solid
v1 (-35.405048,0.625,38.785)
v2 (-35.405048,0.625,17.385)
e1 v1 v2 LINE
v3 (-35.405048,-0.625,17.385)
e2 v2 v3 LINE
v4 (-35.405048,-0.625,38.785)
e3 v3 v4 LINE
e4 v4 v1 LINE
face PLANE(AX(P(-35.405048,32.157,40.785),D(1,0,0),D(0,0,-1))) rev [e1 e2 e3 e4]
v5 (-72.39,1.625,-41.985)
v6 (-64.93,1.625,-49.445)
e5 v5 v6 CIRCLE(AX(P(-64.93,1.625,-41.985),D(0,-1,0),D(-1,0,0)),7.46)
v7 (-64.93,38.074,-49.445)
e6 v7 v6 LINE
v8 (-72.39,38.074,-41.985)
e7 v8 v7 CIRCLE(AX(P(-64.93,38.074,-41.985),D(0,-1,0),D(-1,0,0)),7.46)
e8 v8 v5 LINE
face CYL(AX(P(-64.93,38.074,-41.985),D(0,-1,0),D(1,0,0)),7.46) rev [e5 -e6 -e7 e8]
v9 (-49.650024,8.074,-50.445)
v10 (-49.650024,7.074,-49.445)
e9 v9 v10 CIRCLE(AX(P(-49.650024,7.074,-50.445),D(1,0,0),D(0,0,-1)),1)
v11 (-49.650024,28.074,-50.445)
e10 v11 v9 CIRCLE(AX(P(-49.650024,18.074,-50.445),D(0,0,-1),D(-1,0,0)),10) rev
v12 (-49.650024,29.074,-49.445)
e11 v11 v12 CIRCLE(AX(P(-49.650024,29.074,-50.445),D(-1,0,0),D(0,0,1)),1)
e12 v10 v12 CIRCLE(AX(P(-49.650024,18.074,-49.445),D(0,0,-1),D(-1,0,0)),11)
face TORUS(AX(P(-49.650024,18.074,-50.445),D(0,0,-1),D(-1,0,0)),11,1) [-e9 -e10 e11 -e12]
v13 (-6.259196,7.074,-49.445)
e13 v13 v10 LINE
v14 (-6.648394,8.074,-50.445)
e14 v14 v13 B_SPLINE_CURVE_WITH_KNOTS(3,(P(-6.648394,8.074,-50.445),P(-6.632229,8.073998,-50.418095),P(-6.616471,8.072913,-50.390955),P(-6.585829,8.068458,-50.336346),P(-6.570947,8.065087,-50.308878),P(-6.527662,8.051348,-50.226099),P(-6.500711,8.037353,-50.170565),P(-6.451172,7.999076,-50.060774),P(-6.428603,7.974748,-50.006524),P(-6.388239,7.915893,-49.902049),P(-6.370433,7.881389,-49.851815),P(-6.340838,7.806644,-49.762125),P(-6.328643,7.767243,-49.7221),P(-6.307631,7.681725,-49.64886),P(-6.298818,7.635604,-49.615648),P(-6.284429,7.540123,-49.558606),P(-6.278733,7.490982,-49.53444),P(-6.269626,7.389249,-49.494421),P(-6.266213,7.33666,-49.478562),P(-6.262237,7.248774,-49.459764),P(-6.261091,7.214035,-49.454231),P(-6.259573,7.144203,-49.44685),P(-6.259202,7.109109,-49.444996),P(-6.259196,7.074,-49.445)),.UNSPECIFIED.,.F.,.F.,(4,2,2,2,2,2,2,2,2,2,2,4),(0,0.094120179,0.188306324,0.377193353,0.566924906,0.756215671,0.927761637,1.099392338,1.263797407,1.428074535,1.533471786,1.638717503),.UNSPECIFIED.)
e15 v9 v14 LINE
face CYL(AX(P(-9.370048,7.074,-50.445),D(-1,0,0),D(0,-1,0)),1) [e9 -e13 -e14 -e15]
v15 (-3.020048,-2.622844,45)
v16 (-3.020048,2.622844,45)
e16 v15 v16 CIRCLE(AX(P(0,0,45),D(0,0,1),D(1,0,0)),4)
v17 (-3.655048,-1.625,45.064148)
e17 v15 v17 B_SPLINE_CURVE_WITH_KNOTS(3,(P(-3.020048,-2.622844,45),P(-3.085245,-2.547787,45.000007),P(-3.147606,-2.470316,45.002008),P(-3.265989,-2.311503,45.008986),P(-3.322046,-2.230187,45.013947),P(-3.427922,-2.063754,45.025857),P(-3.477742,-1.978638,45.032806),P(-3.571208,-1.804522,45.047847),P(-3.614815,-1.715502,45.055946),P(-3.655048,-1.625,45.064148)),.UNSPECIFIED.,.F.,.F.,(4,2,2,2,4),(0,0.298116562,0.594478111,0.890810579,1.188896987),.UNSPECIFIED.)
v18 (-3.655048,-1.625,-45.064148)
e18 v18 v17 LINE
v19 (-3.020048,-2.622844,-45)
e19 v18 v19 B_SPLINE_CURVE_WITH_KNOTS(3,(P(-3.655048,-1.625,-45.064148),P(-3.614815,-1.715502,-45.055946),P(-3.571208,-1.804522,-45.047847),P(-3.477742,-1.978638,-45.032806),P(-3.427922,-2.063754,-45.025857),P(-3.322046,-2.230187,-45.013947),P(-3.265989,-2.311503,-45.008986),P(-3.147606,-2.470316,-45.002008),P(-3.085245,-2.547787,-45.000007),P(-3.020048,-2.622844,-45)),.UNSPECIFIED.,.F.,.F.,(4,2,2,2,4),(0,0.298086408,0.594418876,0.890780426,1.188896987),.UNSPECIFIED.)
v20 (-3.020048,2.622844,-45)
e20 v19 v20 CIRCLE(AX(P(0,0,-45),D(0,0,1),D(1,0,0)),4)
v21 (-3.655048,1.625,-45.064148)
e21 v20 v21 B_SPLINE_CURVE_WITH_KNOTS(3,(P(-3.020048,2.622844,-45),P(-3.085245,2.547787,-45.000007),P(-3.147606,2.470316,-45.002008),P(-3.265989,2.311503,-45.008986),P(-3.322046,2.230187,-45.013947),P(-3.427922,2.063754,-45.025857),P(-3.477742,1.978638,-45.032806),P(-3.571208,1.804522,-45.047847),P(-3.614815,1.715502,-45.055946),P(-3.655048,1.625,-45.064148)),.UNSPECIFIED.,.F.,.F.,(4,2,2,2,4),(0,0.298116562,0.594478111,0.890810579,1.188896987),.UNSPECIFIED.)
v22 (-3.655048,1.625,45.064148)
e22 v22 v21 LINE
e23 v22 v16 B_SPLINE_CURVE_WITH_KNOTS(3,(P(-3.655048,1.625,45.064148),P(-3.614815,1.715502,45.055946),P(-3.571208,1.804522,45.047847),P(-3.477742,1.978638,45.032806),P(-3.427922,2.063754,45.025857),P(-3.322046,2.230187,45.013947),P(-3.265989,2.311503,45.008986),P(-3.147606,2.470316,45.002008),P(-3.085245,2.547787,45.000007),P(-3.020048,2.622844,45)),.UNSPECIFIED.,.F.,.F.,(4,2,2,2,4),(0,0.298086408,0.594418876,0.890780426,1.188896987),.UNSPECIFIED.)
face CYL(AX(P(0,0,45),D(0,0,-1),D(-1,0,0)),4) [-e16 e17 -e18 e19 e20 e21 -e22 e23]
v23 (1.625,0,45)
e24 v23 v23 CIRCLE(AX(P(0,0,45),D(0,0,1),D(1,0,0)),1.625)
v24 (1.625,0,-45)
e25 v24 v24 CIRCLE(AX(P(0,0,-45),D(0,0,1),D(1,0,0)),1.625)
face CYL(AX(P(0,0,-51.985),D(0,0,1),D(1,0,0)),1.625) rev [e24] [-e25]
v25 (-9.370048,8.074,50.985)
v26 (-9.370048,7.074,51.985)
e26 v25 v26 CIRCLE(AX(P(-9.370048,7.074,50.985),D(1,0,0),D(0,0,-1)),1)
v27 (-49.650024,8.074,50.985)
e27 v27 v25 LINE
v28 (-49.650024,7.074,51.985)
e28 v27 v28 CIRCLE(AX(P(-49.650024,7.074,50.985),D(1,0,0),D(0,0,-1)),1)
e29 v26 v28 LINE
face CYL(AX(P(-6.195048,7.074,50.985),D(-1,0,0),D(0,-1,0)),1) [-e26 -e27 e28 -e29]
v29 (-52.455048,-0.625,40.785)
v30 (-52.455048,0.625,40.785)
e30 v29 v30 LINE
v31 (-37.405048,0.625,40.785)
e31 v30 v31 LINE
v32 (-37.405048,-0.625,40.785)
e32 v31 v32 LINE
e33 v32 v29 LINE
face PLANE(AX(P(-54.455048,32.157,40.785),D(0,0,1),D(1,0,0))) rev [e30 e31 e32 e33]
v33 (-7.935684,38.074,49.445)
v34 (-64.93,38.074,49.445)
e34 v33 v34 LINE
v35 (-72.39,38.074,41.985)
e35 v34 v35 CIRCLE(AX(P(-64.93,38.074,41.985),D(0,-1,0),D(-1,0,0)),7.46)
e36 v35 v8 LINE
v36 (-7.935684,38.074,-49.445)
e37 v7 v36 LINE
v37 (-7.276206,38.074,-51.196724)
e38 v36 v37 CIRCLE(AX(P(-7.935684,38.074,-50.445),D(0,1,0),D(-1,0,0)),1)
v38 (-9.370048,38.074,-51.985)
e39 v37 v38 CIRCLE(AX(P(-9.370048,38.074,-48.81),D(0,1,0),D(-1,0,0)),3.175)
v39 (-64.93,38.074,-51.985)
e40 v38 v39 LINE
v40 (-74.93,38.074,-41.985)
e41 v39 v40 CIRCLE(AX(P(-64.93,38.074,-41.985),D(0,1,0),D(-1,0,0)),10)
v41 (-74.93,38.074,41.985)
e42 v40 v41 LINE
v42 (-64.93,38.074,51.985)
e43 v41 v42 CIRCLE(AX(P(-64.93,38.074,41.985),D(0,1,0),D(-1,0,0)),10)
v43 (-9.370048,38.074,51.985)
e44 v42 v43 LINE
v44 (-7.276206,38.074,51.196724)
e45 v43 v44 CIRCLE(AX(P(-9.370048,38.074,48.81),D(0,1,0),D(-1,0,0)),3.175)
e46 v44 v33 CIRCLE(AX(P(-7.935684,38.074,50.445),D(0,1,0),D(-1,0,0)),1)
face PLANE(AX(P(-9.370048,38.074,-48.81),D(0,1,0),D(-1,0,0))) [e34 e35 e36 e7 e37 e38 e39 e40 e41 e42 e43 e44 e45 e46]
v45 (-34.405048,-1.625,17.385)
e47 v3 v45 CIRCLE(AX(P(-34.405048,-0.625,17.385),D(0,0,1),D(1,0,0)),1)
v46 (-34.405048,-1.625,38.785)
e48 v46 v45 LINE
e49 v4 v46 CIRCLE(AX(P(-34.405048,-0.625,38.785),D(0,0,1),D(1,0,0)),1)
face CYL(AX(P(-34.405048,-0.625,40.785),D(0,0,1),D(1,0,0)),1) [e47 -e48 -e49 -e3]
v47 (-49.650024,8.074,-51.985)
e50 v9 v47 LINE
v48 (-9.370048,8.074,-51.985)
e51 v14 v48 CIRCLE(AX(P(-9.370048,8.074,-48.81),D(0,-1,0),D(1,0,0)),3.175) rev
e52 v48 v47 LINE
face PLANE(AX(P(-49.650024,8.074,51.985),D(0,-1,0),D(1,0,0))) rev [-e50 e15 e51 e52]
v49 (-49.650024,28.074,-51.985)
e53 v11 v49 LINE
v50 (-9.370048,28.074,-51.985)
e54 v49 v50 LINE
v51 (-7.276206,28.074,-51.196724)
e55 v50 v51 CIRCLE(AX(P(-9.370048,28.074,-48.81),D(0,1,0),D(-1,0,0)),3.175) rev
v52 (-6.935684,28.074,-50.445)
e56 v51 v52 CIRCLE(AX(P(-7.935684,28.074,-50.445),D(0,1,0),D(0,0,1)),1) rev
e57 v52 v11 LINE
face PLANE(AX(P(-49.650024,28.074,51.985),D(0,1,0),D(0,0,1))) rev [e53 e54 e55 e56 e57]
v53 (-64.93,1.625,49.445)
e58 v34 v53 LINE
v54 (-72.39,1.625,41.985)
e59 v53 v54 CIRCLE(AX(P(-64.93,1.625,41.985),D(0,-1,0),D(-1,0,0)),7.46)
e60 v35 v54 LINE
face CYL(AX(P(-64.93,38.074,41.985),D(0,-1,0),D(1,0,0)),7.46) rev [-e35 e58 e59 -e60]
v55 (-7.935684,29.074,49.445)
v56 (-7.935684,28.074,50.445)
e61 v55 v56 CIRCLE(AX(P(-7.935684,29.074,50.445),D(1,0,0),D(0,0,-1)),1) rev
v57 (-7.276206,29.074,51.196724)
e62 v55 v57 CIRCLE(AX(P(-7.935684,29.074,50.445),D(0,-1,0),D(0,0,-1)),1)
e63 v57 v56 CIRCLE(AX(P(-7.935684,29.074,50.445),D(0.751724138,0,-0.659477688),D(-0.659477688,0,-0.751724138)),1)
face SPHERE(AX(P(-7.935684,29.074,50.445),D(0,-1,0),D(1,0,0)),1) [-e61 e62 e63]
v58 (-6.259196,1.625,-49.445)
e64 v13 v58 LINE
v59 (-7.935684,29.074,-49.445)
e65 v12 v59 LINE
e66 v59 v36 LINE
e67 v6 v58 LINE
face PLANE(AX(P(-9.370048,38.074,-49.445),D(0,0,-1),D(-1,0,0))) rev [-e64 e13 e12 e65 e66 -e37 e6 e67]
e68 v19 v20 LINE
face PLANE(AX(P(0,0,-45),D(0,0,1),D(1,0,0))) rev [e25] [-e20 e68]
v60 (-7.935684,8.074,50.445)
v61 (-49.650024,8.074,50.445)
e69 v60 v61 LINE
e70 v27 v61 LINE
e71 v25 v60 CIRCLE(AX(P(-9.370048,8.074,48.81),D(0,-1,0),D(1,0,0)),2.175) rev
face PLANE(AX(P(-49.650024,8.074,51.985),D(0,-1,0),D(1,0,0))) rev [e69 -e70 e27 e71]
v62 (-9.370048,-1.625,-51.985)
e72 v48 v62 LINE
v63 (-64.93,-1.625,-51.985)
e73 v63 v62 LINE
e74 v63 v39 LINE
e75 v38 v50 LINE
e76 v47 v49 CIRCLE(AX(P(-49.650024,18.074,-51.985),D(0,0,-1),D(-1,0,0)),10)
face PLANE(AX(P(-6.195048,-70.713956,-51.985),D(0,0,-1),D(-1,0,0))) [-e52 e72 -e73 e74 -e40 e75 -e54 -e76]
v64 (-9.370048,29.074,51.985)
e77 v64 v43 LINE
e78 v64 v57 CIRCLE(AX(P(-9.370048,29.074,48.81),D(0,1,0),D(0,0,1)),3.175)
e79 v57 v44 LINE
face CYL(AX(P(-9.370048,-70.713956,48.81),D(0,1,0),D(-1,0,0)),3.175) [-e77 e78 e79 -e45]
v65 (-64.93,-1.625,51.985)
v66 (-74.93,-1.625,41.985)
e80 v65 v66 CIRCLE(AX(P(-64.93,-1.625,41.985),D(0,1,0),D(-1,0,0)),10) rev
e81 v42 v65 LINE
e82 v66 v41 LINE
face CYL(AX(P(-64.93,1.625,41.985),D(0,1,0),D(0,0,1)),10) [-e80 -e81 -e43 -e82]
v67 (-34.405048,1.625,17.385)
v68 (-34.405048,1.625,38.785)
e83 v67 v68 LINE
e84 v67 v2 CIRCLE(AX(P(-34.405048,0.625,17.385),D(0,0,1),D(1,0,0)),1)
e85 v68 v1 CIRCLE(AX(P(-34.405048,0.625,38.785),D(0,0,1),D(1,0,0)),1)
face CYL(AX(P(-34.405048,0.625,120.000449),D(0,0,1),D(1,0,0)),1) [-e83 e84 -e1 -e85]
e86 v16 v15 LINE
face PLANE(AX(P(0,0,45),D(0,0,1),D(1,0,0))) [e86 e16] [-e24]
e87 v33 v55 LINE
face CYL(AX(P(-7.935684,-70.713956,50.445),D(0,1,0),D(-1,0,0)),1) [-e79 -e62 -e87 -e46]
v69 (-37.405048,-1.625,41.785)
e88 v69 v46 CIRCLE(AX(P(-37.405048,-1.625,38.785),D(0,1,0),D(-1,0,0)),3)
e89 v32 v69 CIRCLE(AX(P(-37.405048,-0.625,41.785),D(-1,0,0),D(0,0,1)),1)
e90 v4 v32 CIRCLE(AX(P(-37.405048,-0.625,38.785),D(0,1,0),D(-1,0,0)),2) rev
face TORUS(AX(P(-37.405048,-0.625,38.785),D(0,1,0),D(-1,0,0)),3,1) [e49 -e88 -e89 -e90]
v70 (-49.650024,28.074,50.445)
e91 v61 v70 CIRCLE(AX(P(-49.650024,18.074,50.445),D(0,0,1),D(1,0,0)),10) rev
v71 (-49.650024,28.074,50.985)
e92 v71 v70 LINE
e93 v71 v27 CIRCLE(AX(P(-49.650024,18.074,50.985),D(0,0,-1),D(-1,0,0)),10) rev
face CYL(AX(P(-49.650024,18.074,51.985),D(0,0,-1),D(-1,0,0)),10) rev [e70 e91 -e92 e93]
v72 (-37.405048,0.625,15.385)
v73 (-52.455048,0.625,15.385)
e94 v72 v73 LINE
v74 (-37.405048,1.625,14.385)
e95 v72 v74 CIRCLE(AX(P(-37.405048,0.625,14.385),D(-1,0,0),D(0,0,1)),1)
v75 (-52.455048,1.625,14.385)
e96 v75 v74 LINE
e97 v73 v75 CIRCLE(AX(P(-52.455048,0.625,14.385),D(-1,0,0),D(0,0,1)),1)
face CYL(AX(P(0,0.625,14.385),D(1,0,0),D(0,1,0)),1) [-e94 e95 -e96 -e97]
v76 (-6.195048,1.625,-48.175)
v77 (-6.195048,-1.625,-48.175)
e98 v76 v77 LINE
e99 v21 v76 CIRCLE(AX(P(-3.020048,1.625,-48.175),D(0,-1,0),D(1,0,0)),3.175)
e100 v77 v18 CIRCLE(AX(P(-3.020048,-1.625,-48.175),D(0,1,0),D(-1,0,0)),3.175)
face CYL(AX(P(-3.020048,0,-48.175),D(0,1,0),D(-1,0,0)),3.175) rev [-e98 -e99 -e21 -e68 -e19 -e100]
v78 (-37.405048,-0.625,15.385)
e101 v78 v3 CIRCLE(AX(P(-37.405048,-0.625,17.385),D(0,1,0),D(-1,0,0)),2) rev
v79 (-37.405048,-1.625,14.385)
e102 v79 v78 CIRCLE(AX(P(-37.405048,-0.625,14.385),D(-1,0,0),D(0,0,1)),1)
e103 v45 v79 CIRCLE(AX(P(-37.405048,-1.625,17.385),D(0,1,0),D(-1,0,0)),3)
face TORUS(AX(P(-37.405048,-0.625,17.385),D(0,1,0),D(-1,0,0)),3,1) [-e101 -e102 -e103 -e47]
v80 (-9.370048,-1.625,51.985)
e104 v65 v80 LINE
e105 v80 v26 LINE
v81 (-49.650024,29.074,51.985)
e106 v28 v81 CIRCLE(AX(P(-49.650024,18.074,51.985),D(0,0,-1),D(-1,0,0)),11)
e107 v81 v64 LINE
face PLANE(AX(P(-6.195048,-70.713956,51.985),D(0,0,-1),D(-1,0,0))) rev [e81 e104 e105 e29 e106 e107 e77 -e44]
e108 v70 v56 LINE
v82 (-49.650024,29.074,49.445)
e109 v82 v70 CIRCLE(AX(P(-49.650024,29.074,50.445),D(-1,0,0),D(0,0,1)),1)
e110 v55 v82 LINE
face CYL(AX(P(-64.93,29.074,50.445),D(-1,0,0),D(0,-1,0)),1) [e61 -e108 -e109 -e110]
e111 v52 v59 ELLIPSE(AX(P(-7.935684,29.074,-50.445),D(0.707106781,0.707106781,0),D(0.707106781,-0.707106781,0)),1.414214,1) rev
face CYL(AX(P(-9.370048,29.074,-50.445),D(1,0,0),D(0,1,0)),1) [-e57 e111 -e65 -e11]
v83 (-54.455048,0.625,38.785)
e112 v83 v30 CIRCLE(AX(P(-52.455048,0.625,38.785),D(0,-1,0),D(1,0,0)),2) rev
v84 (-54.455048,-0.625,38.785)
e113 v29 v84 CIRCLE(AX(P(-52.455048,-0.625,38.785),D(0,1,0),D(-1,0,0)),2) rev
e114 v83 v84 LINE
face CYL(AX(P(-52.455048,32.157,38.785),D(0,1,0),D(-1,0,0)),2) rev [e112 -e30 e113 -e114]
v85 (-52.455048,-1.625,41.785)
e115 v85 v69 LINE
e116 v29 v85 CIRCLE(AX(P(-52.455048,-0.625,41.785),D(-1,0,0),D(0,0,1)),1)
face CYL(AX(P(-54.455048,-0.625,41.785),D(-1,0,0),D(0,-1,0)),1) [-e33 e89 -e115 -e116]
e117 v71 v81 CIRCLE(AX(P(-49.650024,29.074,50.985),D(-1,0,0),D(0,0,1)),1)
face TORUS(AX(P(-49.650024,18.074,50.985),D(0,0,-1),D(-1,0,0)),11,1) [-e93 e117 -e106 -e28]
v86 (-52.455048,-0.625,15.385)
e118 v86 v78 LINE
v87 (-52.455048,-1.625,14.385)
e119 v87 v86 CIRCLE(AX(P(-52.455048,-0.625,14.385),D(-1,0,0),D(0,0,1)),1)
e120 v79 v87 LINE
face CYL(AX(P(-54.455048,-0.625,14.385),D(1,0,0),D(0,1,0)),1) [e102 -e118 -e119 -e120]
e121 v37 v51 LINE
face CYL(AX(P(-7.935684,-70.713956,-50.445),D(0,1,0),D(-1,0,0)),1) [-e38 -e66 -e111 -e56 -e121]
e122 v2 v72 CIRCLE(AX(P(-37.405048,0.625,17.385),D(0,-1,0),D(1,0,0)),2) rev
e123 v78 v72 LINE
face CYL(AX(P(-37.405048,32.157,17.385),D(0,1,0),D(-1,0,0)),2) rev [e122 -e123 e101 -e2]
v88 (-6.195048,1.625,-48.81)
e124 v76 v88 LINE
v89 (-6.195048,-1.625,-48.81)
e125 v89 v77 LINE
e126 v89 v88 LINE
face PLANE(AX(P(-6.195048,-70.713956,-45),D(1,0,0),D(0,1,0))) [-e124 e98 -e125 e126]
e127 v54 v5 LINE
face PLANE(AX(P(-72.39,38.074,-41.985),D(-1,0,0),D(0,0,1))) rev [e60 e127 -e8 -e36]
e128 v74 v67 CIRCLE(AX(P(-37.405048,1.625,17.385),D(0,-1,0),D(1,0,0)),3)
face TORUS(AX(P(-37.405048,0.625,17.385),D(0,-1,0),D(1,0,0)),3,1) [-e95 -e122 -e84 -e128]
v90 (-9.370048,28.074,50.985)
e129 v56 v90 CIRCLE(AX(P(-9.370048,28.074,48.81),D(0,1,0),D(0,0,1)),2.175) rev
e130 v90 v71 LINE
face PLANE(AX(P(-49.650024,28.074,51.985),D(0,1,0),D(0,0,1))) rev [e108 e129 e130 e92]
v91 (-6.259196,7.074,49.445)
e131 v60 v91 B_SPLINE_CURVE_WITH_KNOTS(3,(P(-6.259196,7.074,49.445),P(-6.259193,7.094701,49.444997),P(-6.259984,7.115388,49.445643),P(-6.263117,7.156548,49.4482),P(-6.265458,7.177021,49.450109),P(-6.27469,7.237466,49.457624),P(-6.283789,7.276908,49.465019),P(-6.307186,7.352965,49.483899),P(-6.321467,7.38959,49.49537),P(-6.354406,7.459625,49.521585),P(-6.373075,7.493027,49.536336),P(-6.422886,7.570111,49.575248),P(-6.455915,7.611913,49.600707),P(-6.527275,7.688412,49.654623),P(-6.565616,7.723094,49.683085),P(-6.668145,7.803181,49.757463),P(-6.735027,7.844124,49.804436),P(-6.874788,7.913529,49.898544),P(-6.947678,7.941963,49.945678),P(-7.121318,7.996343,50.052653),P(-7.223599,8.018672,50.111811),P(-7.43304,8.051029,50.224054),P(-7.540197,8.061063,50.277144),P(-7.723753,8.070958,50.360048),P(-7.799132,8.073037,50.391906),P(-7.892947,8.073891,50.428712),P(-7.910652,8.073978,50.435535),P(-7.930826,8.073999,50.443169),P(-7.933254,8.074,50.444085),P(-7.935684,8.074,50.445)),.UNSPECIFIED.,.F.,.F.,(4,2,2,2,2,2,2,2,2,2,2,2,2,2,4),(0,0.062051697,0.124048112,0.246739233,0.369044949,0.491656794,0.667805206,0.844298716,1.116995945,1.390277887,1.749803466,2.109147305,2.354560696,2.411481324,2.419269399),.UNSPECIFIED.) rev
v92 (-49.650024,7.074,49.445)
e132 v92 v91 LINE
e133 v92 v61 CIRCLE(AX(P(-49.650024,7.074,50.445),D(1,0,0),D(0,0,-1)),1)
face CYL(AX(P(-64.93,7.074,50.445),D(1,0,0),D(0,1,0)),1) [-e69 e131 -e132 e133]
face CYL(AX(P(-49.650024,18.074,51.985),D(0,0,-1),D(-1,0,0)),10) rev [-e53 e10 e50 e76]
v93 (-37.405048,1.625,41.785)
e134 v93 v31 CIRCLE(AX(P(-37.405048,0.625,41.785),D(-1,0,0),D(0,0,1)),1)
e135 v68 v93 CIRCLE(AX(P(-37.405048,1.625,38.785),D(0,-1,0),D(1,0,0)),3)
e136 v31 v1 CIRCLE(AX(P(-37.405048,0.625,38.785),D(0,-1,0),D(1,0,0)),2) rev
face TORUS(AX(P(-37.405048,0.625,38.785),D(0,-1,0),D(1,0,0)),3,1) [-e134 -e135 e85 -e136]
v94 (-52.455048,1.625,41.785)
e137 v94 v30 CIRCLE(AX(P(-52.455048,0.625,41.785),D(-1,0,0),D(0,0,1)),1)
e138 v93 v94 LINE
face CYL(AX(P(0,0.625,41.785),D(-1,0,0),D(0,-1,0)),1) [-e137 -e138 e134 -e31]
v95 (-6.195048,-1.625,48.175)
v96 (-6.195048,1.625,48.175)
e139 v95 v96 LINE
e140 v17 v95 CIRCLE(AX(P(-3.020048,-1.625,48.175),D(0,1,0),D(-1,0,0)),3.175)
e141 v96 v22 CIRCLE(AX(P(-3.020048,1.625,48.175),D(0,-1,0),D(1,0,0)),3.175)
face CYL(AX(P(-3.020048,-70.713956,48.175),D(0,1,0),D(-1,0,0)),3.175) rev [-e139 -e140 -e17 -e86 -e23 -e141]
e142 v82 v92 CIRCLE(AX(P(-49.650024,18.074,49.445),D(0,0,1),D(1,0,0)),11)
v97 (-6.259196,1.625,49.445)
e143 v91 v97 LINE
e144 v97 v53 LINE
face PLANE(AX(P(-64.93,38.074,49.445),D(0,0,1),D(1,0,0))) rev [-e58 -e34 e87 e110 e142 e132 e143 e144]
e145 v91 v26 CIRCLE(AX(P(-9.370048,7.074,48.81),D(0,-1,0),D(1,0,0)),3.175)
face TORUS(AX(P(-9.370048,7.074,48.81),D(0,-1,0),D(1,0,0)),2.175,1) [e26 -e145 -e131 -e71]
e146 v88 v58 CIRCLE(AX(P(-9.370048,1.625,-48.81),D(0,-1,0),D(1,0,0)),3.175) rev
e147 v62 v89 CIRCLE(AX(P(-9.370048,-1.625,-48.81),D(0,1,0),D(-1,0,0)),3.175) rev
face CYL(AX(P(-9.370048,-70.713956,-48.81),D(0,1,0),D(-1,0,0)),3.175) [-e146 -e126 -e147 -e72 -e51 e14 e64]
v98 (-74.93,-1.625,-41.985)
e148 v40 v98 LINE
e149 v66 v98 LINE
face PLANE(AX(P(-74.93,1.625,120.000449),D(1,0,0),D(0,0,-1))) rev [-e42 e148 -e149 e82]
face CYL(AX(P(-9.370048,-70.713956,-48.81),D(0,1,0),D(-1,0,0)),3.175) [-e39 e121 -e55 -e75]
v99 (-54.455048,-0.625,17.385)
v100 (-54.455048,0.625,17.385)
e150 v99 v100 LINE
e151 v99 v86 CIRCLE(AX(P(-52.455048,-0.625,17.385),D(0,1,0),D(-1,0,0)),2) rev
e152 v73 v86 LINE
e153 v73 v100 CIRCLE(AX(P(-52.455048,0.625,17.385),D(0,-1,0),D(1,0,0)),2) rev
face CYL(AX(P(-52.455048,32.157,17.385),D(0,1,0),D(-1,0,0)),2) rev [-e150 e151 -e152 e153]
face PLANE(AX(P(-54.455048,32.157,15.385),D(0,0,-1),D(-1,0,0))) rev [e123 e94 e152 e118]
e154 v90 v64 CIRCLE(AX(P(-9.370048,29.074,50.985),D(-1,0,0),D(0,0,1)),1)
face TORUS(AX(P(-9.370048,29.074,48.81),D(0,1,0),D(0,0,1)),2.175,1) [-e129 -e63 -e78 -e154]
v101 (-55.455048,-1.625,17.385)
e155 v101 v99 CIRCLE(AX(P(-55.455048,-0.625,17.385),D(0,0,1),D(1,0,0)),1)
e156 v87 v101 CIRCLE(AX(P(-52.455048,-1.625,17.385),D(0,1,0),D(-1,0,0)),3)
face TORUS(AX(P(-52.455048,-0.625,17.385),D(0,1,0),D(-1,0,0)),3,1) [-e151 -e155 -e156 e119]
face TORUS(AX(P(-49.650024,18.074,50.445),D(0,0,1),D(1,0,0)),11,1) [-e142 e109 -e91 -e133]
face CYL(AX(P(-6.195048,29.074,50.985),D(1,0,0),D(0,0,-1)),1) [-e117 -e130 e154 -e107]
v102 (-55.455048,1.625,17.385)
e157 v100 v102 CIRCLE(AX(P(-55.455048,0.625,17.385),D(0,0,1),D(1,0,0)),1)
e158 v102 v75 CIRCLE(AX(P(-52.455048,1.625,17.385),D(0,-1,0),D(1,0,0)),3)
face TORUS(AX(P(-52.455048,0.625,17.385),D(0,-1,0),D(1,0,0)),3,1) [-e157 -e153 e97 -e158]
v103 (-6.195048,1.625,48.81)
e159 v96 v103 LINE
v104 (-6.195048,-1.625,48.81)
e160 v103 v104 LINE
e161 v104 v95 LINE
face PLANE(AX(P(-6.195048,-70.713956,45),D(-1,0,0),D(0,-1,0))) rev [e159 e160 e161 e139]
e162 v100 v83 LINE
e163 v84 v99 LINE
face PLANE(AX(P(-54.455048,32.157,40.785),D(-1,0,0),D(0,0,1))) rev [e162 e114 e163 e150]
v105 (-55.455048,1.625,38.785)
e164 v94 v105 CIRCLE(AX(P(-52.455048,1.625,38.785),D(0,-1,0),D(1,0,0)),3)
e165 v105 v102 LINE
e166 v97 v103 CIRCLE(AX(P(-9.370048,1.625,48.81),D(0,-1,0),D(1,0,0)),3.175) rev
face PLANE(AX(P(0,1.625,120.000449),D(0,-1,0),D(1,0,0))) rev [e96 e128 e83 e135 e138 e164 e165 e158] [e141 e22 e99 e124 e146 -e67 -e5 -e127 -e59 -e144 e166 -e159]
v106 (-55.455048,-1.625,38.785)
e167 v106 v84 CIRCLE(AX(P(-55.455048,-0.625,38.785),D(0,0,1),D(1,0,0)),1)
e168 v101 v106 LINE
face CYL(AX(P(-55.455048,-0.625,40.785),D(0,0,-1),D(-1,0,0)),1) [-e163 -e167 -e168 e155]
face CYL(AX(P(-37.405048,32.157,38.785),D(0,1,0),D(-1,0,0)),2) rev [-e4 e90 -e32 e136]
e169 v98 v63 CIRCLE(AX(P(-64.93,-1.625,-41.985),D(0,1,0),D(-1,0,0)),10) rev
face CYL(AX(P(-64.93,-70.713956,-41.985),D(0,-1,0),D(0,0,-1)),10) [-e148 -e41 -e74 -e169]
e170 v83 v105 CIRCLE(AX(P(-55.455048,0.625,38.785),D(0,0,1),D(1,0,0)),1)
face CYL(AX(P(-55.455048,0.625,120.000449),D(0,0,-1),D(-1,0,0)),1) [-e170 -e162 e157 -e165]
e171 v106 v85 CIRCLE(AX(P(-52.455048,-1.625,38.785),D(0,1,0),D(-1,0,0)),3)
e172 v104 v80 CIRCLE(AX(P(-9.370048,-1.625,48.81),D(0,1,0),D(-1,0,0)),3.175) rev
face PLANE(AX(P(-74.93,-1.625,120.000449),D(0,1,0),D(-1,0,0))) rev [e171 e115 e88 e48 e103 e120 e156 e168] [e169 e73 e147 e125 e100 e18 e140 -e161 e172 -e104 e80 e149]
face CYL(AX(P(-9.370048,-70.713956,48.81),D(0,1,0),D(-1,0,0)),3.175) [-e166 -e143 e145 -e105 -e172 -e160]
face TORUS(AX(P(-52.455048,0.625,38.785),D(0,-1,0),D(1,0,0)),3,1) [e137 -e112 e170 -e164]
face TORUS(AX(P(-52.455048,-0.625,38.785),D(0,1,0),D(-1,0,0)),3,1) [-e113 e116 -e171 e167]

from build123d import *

# Parameters (mm, degrees)
SKETCH1_R                       = 4
BOSS_EXTRUDE1_DEPTH             = 45
SKETCH2_R                       = 1.625
BOSS_EXTRUDE2_DEPTH             = 2
FILLET1_R                       = 1
FILLET1_OF_MIRROR1_R            = 1
BOSS_EXTRUDE3_REACH             = 49.339
BOSS_EXTRUDE3_DIRECTION_2_REACH = 49.339
SKETCH5_W                       = 68.734952121
SKETCH5_H                       = 6.985
BOSS_EXTRUDE4_DEPTH             = 3.25
FILLET2_R                       = 3.175
FILLET3_R                       = 10
BOSS_EXTRUDE5_DEPTH             = 36.449
SKETCH7_W                       = 19.05
SKETCH7_H                       = 25.4
CUT_EXTRUDE1_DEPTH              = 33.782
FILLET4_R                       = 2
CUT_EXTRUDE2_DEPTH              = 134.693288074
CUT_EXTRUDE3_DEPTH              = 99.825981407
CUT_EXTRUDE3_DEPTH_BACK         = 99.825981407
SKETCH13_R                      = 1.625
SKETCH14_W                      = 22.869052137
SKETCH14_H                      = 20
CUT_EXTRUDE4_DEPTH              = 134.693288074
FILLET5_R                       = 1


with BuildPart() as part:
    # Sketch1 → Boss-Extrude1 (new, symmetric)
    with BuildSketch(Plane.XY):
        with Locations(Location((0, 0, 0), (0, 0, 180))):
            Circle(SKETCH1_R)
    extrude(amount=BOSS_EXTRUDE1_DEPTH, both=True)

    # Sketch2 → Boss-Extrude2 (add)
    with BuildSketch(Plane.XY.offset(45)):
        Circle(SKETCH2_R)
    boss_extrude2 = extrude(amount=BOSS_EXTRUDE2_DEPTH)

    # Fillet1
    fillet1_edges = [part.edges().sort_by_distance(p)[0] for p in [
        (-1.625, 0, 47),
    ]]
    fillet(fillet1_edges, radius=FILLET1_R)

    # Mirror1: Boss-Extrude2 across plane
    add(boss_extrude2.mirror(Plane.XY))

    # Fillet1 of Mirror1
    fillet1_of_mirror1_edges = [part.edges().sort_by_distance(p)[0] for p in [
        (-1.625, 0, -47),
    ]]
    fillet(fillet1_of_mirror1_edges, radius=FILLET1_OF_MIRROR1_R)

    # Boss-Extrude3: up to this face of the body (flat: up to its plane)
    boss_extrude3_end = Plane(part.part.faces().sort_by_distance((3.886862915, 0, 45))[0])
    # Sketch3 → Boss-Extrude3 (add, up to the picked face)
    with BuildSketch(Plane.XY, mode=Mode.PRIVATE) as boss_extrude3_sk1:
        Polygon((0, 0), (0, 1.625), (-74.93, 1.625), (-74.93, -1.625), (0, -1.625), align=None)
    boss_extrude3_tool1 = split(extrude(boss_extrude3_sk1.sketch, amount=BOSS_EXTRUDE3_REACH, mode=Mode.PRIVATE), bisect_by=boss_extrude3_end, keep=Keep.BOTH, mode=Mode.PRIVATE)
    add(boss_extrude3_tool1.solids().sort_by(Axis((-37.465, 0, 0), (0, 0, 1)))[0])

    # Boss-Extrude3 direction 2: up to this face of the body (flat: up to its plane)
    boss_extrude3_direction_2_end = Plane(part.part.faces().sort_by_distance((3.886862915, 0, -45))[0])
    # Sketch3 → Boss-Extrude3 direction 2 (add, up to the picked face)
    with BuildSketch(Plane.XY, mode=Mode.PRIVATE) as boss_extrude3_direction_2_sk1:
        Polygon((0, 0), (0, 1.625), (-74.93, 1.625), (-74.93, -1.625), (0, -1.625), align=None)
    boss_extrude3_direction_2_tool1 = split(extrude(boss_extrude3_direction_2_sk1.sketch, amount=-BOSS_EXTRUDE3_DIRECTION_2_REACH, mode=Mode.PRIVATE), bisect_by=boss_extrude3_direction_2_end, keep=Keep.BOTH, mode=Mode.PRIVATE)
    add(boss_extrude3_direction_2_tool1.solids().sort_by(Axis((-37.465, 0, 0), (0, 0, -1)))[0])

    # Sketch5 → Boss-Extrude4 (add)
    with BuildSketch(Plane(origin=(0, 1.625, 0), x_dir=(1, 0, 0), z_dir=(0, 1, 0))):
        with Locations((-40.56252394, 48.4925)):
            Rectangle(SKETCH5_W, SKETCH5_H)
    boss_extrude4 = extrude(amount=-BOSS_EXTRUDE4_DEPTH)

    # Mirror2: Boss-Extrude4 across plane
    add(boss_extrude4.mirror(Plane.XY))

    # Fillet2
    # the kernel refuses this fillet: 3.175 mm, written as the material it adds along each edge
    with BuildSketch(Plane(origin=(-6.195047879, 1.625, -45), x_dir=(1, 0, 0), z_dir=(0, -1, 0))) as fillet2_piece_1_section:
        with BuildLine():
            CenterArc((FILLET2_R, -FILLET2_R), FILLET2_R, 90, 90)
            Line((0, -FILLET2_R), (0, 0))
            Line((0, 0), (FILLET2_R, 0))
        make_face()
    fillet2_piece_1 = extrude(amount=3.25, mode=Mode.PRIVATE)
    fillet2_piece_1 = fillet2_piece_1 - Plane(origin=(0, 0, -45.745349648), x_dir=(-1, 0, 0), z_dir=(0, 0, 1)) * Cylinder(4, 20, mode=Mode.PRIVATE)
    add(fillet2_piece_1)
    with BuildSketch(Plane(origin=(-6.195047879, 9.5625, -45), x_dir=(1, 0, 0), z_dir=(0, -1, 0))) as fillet2_piece_2_section:
        with BuildLine():
            CenterArc((FILLET2_R, -FILLET2_R), FILLET2_R, 90, 90)
            Line((0, -FILLET2_R), (0, 0))
            Line((0, 0), (FILLET2_R, 0))
        make_face()
    fillet2_piece_2 = extrude(amount=11.1875, mode=Mode.PRIVATE)
    fillet2_piece_2 = split(fillet2_piece_2, bisect_by=Plane(origin=(-3.269448726, 1.625, -44.97522317), z_dir=(0, 1, 0)), keep=Keep.TOP, mode=Mode.PRIVATE)
    fillet2_piece_2 = fillet2_piece_2 & Plane(origin=(0, 0, -44.97522317), x_dir=(-1, 0, 0), z_dir=(0, 0, 1)) * Cylinder(4, 36, mode=Mode.PRIVATE)
    add(fillet2_piece_2)
    with BuildSketch(Plane(origin=(-6.195047879, 1.625, -45), x_dir=(1, 0, 0), z_dir=(0, -1, 0))) as fillet2_piece_3_section:
        with BuildLine():
            CenterArc((FILLET2_R, -FILLET2_R), FILLET2_R, 90, 90)
            Line((0, -FILLET2_R), (0, 0))
            Line((0, 0), (FILLET2_R, 0))
        make_face()
    fillet2_piece_3 = extrude(amount=3.25, mode=Mode.PRIVATE)
    fillet2_piece_3 = fillet2_piece_3 & Plane(origin=(0, 0, -44.99635319), x_dir=(-1, 0, 0), z_dir=(0, 0, 1)) * Cylinder(4, 20, mode=Mode.PRIVATE)
    add(fillet2_piece_3)
    with BuildSketch(Plane(origin=(-6.195047879, 1.625, -45), x_dir=(1, 0, 0), z_dir=(0, -1, 0))) as fillet2_piece_4_section:
        with BuildLine():
            CenterArc((FILLET2_R, -FILLET2_R), FILLET2_R, 90, 90)
            Line((0, -FILLET2_R), (0, 0))
            Line((0, 0), (FILLET2_R, 0))
        make_face()
    fillet2_piece_4 = extrude(amount=11.1875, mode=Mode.PRIVATE)
    fillet2_piece_4 = split(fillet2_piece_4, bisect_by=Plane(origin=(-3.269448726, -1.625, -44.97522317), z_dir=(0, -1, 0)), keep=Keep.TOP, mode=Mode.PRIVATE)
    fillet2_piece_4 = fillet2_piece_4 & Plane(origin=(0, 0, -44.97522317), x_dir=(-1, 0, 0), z_dir=(0, 0, 1)) * Cylinder(4, 36, mode=Mode.PRIVATE)
    add(fillet2_piece_4)
    with BuildSketch(Plane(origin=(-6.195047879, 1.625, 45), x_dir=(1, 0, 0), z_dir=(0, -1, 0))) as fillet2_piece_5_section:
        with BuildLine():
            CenterArc((FILLET2_R, FILLET2_R), FILLET2_R, 180, 90)
            Line((0, FILLET2_R), (0, 0))
            Line((0, 0), (FILLET2_R, 0))
        make_face()
    fillet2_piece_5 = extrude(amount=3.25, mode=Mode.PRIVATE)
    fillet2_piece_5 = fillet2_piece_5 - Plane(origin=(0, 0, 45.745349648), x_dir=(-1, 0, 0), z_dir=(0, 0, 1)) * Cylinder(4, 20, mode=Mode.PRIVATE)
    add(fillet2_piece_5)
    with BuildSketch(Plane(origin=(-6.195047879, 9.5625, 45), x_dir=(1, 0, 0), z_dir=(0, -1, 0))) as fillet2_piece_6_section:
        with BuildLine():
            CenterArc((FILLET2_R, FILLET2_R), FILLET2_R, 180, 90)
            Line((0, FILLET2_R), (0, 0))
            Line((0, 0), (FILLET2_R, 0))
        make_face()
    fillet2_piece_6 = extrude(amount=11.1875, mode=Mode.PRIVATE)
    fillet2_piece_6 = fillet2_piece_6 & Plane(origin=(0, 0, 44.97522317), x_dir=(-1, 0, 0), z_dir=(0, 0, 1)) * Cylinder(4, 36, mode=Mode.PRIVATE)
    fillet2_piece_6 = split(fillet2_piece_6, bisect_by=Plane(origin=(-3.269448726, 1.625, 44.97522317), z_dir=(0, 1, 0)), keep=Keep.TOP, mode=Mode.PRIVATE)
    add(fillet2_piece_6)
    with BuildSketch(Plane(origin=(-6.195047879, 1.625, 45), x_dir=(1, 0, 0), z_dir=(0, -1, 0))) as fillet2_piece_7_section:
        with BuildLine():
            CenterArc((FILLET2_R, FILLET2_R), FILLET2_R, 180, 90)
            Line((0, FILLET2_R), (0, 0))
            Line((0, 0), (FILLET2_R, 0))
        make_face()
    fillet2_piece_7 = extrude(amount=3.25, mode=Mode.PRIVATE)
    fillet2_piece_7 = fillet2_piece_7 & Plane(origin=(0, 0, 44.99635319), x_dir=(-1, 0, 0), z_dir=(0, 0, 1)) * Cylinder(4, 20, mode=Mode.PRIVATE)
    add(fillet2_piece_7)
    with BuildSketch(Plane(origin=(-6.195047879, 1.625, 45), x_dir=(1, 0, 0), z_dir=(0, -1, 0))) as fillet2_piece_8_section:
        with BuildLine():
            CenterArc((FILLET2_R, FILLET2_R), FILLET2_R, 180, 90)
            Line((0, FILLET2_R), (0, 0))
            Line((0, 0), (FILLET2_R, 0))
        make_face()
    fillet2_piece_8 = extrude(amount=11.1875, mode=Mode.PRIVATE)
    fillet2_piece_8 = fillet2_piece_8 & Plane(origin=(0, 0, 44.97522317), x_dir=(-1, 0, 0), z_dir=(0, 0, 1)) * Cylinder(4, 36, mode=Mode.PRIVATE)
    fillet2_piece_8 = split(fillet2_piece_8, bisect_by=Plane(origin=(-3.269448726, -1.625, 44.97522317), z_dir=(0, -1, 0)), keep=Keep.TOP, mode=Mode.PRIVATE)
    add(fillet2_piece_8)
    # the kernel refuses this fillet: 3.175 mm, written as the material it takes off along each edge
    with BuildSketch(Plane(origin=(-6.195047879, 9.5625, -51.985), x_dir=(0, 0, 1), z_dir=(0, -1, 0)), Plane(origin=(-6.195047879, 9.5625, 51.985), x_dir=(-1, 0, 0), z_dir=(0, -1, 0))) as fillet2_2_piece_1:
        with BuildLine():
            CenterArc((FILLET2_R, FILLET2_R), FILLET2_R, 180, 90)
            Line((0, FILLET2_R), (0, 0))
            Line((0, 0), (FILLET2_R, 0))
        make_face()
    extrude(amount=19.125, mode=Mode.SUBTRACT)

    # Fillet3
    fillet3_edges = [part.edges().sort_by_distance(p)[0] for p in [
        (-74.93, 0, -51.985),
        (-74.93, 0, 51.985),
    ]]
    fillet(fillet3_edges, radius=FILLET3_R)

    # Sketch6 → Boss-Extrude5 (add)
    with BuildSketch(Plane(origin=(0, 1.625, 0), x_dir=(1, 0, 0), z_dir=(0, 1, 0))):
        with BuildLine():
            Line((-9.370047879, 49.445), (-64.93, 49.445))
            ThreePointArc((-64.93, 49.445), (-70.205016588, 47.260016588), (-72.39, 41.985))
            Line((-72.39, 41.985), (-72.39, -41.985))
            ThreePointArc((-72.39, -41.985), (-70.205016588, -47.260016588), (-64.93, -49.445))
            Line((-64.93, -49.445), (-9.370047879, -49.445))
            Line((-9.370047879, -49.445), (-6.259195906, -49.445))
            ThreePointArc((-6.259195906, -49.445), (-7.362001565, -51.269344425), (-9.370047879, -51.985))
            Line((-9.370047879, -51.985), (-64.93, -51.985))
            ThreePointArc((-64.93, -51.985), (-72.001067812, -49.056067812), (-74.93, -41.985))
            Line((-74.93, -41.985), (-74.93, 41.985))
            ThreePointArc((-74.93, 41.985), (-72.001067812, 49.056067812), (-64.93, 51.985))
            Line((-64.93, 51.985), (-9.370047879, 51.985))
            ThreePointArc((-9.370047879, 51.985), (-7.362001565, 51.269344425), (-6.259195906, 49.445))
            Line((-6.259195906, 49.445), (-9.370047879, 49.445))
        make_face()
    extrude(amount=BOSS_EXTRUDE5_DEPTH)

    # Sketch7 → Cut-Extrude1 (cut)
    with BuildSketch(Plane.XZ.offset(1.625)):
        with Locations((-44.930047879, 28.085)):
            Rectangle(SKETCH7_W, SKETCH7_H)
    extrude(amount=-CUT_EXTRUDE1_DEPTH, mode=Mode.SUBTRACT)

    # Fillet4
    fillet4_edges = [part.edges().sort_by_distance(p)[0] for p in [
        (-35.405047879, 0, 40.785),
        (-35.405047879, 0, 15.385),
        (-54.455047879, 0, 15.385),
        (-54.455047879, 0, 40.785),
    ]]
    fillet(fillet4_edges, radius=FILLET4_R)

    # Sketch9 → Cut-Extrude2 (cut, through all)
    with BuildSketch(Plane(origin=(0, 0, -51.985), x_dir=(-1, 0, 0), z_dir=(0, 0, -1))):
        with BuildLine():
            Line((49.65002394, 8.074), (24.65002394, 8.074))
            ThreePointArc((24.65002394, 8.074), (14.65002394, 18.074), (24.65002394, 28.074))
            Line((24.65002394, 28.074), (49.65002394, 28.074))
            ThreePointArc((49.65002394, 28.074), (59.65002394, 18.074), (49.65002394, 8.074))
        make_face()
    extrude(amount=-CUT_EXTRUDE2_DEPTH, mode=Mode.SUBTRACT)

    # Sketch13 → Cut-Extrude3 (cut, two sides: drawn at the far end of the back side and taken through both)
    with BuildSketch(Plane.XY.offset(-CUT_EXTRUDE3_DEPTH_BACK)):
        Circle(SKETCH13_R)
    extrude(amount=CUT_EXTRUDE3_DEPTH + CUT_EXTRUDE3_DEPTH_BACK, mode=Mode.SUBTRACT)

    # Sketch14 → Cut-Extrude4 (cut, through all)
    with BuildSketch(Plane(origin=(0, 0, -51.985), x_dir=(-1, 0, 0), z_dir=(0, 0, -1))):
        with Locations((13.215497872, 18.074)):
            Rectangle(SKETCH14_W, SKETCH14_H)
    extrude(amount=-CUT_EXTRUDE4_DEPTH, mode=Mode.SUBTRACT)

    # Fillet5
    fillet5_edges = [part.edges().sort_by_distance(p)[0] for p in [
        (-53.869261442, 1.625, 40.199213562),
        (-44.930047879, 1.625, 40.785),
        (-35.990834317, 1.625, 40.199213562),
        (-35.405047879, 1.625, 28.085),
        (-35.990834317, 1.625, 15.970786438),
        (-44.930047879, 1.625, 15.385),
        (-53.869261442, 1.625, 15.970786438),
        (-53.869261442, -1.625, 40.199213562),
        (-44.930047879, -1.625, 40.785),
        (-35.990834317, -1.625, 40.199213562),
        (-35.405047879, -1.625, 28.085),
        (-35.990834317, -1.625, 15.970786438),
        (-44.930047879, -1.625, 15.385),
        (-53.869261442, -1.625, 15.970786438),
        (-37.15002394, 8.074, -49.445),
        (-59.65002394, 18.074, -49.445),
        (-37.15002394, 8.074, 49.445),
        (-59.65002394, 18.074, 49.445),
        (-59.65002394, 18.074, 51.985),
        (-37.15002394, 8.074, 51.985),
        (-54.455047879, 1.625, 28.085),
        (-54.455047879, -1.625, 28.085),
        (-37.15002394, 28.074, -49.445),
        (-37.15002394, 28.074, 49.445),
        (-37.15002394, 28.074, 51.985),
        (-7.362001565, 8.074, 51.269344425),
        (-7.362001565, 28.074, 51.269344425),
        (-6.259195906, 33.074, 49.445),
        (-6.259195906, 33.074, -49.445),
    ]]
    fillet(fillet5_edges, radius=FILLET5_R)


solid = part.part
